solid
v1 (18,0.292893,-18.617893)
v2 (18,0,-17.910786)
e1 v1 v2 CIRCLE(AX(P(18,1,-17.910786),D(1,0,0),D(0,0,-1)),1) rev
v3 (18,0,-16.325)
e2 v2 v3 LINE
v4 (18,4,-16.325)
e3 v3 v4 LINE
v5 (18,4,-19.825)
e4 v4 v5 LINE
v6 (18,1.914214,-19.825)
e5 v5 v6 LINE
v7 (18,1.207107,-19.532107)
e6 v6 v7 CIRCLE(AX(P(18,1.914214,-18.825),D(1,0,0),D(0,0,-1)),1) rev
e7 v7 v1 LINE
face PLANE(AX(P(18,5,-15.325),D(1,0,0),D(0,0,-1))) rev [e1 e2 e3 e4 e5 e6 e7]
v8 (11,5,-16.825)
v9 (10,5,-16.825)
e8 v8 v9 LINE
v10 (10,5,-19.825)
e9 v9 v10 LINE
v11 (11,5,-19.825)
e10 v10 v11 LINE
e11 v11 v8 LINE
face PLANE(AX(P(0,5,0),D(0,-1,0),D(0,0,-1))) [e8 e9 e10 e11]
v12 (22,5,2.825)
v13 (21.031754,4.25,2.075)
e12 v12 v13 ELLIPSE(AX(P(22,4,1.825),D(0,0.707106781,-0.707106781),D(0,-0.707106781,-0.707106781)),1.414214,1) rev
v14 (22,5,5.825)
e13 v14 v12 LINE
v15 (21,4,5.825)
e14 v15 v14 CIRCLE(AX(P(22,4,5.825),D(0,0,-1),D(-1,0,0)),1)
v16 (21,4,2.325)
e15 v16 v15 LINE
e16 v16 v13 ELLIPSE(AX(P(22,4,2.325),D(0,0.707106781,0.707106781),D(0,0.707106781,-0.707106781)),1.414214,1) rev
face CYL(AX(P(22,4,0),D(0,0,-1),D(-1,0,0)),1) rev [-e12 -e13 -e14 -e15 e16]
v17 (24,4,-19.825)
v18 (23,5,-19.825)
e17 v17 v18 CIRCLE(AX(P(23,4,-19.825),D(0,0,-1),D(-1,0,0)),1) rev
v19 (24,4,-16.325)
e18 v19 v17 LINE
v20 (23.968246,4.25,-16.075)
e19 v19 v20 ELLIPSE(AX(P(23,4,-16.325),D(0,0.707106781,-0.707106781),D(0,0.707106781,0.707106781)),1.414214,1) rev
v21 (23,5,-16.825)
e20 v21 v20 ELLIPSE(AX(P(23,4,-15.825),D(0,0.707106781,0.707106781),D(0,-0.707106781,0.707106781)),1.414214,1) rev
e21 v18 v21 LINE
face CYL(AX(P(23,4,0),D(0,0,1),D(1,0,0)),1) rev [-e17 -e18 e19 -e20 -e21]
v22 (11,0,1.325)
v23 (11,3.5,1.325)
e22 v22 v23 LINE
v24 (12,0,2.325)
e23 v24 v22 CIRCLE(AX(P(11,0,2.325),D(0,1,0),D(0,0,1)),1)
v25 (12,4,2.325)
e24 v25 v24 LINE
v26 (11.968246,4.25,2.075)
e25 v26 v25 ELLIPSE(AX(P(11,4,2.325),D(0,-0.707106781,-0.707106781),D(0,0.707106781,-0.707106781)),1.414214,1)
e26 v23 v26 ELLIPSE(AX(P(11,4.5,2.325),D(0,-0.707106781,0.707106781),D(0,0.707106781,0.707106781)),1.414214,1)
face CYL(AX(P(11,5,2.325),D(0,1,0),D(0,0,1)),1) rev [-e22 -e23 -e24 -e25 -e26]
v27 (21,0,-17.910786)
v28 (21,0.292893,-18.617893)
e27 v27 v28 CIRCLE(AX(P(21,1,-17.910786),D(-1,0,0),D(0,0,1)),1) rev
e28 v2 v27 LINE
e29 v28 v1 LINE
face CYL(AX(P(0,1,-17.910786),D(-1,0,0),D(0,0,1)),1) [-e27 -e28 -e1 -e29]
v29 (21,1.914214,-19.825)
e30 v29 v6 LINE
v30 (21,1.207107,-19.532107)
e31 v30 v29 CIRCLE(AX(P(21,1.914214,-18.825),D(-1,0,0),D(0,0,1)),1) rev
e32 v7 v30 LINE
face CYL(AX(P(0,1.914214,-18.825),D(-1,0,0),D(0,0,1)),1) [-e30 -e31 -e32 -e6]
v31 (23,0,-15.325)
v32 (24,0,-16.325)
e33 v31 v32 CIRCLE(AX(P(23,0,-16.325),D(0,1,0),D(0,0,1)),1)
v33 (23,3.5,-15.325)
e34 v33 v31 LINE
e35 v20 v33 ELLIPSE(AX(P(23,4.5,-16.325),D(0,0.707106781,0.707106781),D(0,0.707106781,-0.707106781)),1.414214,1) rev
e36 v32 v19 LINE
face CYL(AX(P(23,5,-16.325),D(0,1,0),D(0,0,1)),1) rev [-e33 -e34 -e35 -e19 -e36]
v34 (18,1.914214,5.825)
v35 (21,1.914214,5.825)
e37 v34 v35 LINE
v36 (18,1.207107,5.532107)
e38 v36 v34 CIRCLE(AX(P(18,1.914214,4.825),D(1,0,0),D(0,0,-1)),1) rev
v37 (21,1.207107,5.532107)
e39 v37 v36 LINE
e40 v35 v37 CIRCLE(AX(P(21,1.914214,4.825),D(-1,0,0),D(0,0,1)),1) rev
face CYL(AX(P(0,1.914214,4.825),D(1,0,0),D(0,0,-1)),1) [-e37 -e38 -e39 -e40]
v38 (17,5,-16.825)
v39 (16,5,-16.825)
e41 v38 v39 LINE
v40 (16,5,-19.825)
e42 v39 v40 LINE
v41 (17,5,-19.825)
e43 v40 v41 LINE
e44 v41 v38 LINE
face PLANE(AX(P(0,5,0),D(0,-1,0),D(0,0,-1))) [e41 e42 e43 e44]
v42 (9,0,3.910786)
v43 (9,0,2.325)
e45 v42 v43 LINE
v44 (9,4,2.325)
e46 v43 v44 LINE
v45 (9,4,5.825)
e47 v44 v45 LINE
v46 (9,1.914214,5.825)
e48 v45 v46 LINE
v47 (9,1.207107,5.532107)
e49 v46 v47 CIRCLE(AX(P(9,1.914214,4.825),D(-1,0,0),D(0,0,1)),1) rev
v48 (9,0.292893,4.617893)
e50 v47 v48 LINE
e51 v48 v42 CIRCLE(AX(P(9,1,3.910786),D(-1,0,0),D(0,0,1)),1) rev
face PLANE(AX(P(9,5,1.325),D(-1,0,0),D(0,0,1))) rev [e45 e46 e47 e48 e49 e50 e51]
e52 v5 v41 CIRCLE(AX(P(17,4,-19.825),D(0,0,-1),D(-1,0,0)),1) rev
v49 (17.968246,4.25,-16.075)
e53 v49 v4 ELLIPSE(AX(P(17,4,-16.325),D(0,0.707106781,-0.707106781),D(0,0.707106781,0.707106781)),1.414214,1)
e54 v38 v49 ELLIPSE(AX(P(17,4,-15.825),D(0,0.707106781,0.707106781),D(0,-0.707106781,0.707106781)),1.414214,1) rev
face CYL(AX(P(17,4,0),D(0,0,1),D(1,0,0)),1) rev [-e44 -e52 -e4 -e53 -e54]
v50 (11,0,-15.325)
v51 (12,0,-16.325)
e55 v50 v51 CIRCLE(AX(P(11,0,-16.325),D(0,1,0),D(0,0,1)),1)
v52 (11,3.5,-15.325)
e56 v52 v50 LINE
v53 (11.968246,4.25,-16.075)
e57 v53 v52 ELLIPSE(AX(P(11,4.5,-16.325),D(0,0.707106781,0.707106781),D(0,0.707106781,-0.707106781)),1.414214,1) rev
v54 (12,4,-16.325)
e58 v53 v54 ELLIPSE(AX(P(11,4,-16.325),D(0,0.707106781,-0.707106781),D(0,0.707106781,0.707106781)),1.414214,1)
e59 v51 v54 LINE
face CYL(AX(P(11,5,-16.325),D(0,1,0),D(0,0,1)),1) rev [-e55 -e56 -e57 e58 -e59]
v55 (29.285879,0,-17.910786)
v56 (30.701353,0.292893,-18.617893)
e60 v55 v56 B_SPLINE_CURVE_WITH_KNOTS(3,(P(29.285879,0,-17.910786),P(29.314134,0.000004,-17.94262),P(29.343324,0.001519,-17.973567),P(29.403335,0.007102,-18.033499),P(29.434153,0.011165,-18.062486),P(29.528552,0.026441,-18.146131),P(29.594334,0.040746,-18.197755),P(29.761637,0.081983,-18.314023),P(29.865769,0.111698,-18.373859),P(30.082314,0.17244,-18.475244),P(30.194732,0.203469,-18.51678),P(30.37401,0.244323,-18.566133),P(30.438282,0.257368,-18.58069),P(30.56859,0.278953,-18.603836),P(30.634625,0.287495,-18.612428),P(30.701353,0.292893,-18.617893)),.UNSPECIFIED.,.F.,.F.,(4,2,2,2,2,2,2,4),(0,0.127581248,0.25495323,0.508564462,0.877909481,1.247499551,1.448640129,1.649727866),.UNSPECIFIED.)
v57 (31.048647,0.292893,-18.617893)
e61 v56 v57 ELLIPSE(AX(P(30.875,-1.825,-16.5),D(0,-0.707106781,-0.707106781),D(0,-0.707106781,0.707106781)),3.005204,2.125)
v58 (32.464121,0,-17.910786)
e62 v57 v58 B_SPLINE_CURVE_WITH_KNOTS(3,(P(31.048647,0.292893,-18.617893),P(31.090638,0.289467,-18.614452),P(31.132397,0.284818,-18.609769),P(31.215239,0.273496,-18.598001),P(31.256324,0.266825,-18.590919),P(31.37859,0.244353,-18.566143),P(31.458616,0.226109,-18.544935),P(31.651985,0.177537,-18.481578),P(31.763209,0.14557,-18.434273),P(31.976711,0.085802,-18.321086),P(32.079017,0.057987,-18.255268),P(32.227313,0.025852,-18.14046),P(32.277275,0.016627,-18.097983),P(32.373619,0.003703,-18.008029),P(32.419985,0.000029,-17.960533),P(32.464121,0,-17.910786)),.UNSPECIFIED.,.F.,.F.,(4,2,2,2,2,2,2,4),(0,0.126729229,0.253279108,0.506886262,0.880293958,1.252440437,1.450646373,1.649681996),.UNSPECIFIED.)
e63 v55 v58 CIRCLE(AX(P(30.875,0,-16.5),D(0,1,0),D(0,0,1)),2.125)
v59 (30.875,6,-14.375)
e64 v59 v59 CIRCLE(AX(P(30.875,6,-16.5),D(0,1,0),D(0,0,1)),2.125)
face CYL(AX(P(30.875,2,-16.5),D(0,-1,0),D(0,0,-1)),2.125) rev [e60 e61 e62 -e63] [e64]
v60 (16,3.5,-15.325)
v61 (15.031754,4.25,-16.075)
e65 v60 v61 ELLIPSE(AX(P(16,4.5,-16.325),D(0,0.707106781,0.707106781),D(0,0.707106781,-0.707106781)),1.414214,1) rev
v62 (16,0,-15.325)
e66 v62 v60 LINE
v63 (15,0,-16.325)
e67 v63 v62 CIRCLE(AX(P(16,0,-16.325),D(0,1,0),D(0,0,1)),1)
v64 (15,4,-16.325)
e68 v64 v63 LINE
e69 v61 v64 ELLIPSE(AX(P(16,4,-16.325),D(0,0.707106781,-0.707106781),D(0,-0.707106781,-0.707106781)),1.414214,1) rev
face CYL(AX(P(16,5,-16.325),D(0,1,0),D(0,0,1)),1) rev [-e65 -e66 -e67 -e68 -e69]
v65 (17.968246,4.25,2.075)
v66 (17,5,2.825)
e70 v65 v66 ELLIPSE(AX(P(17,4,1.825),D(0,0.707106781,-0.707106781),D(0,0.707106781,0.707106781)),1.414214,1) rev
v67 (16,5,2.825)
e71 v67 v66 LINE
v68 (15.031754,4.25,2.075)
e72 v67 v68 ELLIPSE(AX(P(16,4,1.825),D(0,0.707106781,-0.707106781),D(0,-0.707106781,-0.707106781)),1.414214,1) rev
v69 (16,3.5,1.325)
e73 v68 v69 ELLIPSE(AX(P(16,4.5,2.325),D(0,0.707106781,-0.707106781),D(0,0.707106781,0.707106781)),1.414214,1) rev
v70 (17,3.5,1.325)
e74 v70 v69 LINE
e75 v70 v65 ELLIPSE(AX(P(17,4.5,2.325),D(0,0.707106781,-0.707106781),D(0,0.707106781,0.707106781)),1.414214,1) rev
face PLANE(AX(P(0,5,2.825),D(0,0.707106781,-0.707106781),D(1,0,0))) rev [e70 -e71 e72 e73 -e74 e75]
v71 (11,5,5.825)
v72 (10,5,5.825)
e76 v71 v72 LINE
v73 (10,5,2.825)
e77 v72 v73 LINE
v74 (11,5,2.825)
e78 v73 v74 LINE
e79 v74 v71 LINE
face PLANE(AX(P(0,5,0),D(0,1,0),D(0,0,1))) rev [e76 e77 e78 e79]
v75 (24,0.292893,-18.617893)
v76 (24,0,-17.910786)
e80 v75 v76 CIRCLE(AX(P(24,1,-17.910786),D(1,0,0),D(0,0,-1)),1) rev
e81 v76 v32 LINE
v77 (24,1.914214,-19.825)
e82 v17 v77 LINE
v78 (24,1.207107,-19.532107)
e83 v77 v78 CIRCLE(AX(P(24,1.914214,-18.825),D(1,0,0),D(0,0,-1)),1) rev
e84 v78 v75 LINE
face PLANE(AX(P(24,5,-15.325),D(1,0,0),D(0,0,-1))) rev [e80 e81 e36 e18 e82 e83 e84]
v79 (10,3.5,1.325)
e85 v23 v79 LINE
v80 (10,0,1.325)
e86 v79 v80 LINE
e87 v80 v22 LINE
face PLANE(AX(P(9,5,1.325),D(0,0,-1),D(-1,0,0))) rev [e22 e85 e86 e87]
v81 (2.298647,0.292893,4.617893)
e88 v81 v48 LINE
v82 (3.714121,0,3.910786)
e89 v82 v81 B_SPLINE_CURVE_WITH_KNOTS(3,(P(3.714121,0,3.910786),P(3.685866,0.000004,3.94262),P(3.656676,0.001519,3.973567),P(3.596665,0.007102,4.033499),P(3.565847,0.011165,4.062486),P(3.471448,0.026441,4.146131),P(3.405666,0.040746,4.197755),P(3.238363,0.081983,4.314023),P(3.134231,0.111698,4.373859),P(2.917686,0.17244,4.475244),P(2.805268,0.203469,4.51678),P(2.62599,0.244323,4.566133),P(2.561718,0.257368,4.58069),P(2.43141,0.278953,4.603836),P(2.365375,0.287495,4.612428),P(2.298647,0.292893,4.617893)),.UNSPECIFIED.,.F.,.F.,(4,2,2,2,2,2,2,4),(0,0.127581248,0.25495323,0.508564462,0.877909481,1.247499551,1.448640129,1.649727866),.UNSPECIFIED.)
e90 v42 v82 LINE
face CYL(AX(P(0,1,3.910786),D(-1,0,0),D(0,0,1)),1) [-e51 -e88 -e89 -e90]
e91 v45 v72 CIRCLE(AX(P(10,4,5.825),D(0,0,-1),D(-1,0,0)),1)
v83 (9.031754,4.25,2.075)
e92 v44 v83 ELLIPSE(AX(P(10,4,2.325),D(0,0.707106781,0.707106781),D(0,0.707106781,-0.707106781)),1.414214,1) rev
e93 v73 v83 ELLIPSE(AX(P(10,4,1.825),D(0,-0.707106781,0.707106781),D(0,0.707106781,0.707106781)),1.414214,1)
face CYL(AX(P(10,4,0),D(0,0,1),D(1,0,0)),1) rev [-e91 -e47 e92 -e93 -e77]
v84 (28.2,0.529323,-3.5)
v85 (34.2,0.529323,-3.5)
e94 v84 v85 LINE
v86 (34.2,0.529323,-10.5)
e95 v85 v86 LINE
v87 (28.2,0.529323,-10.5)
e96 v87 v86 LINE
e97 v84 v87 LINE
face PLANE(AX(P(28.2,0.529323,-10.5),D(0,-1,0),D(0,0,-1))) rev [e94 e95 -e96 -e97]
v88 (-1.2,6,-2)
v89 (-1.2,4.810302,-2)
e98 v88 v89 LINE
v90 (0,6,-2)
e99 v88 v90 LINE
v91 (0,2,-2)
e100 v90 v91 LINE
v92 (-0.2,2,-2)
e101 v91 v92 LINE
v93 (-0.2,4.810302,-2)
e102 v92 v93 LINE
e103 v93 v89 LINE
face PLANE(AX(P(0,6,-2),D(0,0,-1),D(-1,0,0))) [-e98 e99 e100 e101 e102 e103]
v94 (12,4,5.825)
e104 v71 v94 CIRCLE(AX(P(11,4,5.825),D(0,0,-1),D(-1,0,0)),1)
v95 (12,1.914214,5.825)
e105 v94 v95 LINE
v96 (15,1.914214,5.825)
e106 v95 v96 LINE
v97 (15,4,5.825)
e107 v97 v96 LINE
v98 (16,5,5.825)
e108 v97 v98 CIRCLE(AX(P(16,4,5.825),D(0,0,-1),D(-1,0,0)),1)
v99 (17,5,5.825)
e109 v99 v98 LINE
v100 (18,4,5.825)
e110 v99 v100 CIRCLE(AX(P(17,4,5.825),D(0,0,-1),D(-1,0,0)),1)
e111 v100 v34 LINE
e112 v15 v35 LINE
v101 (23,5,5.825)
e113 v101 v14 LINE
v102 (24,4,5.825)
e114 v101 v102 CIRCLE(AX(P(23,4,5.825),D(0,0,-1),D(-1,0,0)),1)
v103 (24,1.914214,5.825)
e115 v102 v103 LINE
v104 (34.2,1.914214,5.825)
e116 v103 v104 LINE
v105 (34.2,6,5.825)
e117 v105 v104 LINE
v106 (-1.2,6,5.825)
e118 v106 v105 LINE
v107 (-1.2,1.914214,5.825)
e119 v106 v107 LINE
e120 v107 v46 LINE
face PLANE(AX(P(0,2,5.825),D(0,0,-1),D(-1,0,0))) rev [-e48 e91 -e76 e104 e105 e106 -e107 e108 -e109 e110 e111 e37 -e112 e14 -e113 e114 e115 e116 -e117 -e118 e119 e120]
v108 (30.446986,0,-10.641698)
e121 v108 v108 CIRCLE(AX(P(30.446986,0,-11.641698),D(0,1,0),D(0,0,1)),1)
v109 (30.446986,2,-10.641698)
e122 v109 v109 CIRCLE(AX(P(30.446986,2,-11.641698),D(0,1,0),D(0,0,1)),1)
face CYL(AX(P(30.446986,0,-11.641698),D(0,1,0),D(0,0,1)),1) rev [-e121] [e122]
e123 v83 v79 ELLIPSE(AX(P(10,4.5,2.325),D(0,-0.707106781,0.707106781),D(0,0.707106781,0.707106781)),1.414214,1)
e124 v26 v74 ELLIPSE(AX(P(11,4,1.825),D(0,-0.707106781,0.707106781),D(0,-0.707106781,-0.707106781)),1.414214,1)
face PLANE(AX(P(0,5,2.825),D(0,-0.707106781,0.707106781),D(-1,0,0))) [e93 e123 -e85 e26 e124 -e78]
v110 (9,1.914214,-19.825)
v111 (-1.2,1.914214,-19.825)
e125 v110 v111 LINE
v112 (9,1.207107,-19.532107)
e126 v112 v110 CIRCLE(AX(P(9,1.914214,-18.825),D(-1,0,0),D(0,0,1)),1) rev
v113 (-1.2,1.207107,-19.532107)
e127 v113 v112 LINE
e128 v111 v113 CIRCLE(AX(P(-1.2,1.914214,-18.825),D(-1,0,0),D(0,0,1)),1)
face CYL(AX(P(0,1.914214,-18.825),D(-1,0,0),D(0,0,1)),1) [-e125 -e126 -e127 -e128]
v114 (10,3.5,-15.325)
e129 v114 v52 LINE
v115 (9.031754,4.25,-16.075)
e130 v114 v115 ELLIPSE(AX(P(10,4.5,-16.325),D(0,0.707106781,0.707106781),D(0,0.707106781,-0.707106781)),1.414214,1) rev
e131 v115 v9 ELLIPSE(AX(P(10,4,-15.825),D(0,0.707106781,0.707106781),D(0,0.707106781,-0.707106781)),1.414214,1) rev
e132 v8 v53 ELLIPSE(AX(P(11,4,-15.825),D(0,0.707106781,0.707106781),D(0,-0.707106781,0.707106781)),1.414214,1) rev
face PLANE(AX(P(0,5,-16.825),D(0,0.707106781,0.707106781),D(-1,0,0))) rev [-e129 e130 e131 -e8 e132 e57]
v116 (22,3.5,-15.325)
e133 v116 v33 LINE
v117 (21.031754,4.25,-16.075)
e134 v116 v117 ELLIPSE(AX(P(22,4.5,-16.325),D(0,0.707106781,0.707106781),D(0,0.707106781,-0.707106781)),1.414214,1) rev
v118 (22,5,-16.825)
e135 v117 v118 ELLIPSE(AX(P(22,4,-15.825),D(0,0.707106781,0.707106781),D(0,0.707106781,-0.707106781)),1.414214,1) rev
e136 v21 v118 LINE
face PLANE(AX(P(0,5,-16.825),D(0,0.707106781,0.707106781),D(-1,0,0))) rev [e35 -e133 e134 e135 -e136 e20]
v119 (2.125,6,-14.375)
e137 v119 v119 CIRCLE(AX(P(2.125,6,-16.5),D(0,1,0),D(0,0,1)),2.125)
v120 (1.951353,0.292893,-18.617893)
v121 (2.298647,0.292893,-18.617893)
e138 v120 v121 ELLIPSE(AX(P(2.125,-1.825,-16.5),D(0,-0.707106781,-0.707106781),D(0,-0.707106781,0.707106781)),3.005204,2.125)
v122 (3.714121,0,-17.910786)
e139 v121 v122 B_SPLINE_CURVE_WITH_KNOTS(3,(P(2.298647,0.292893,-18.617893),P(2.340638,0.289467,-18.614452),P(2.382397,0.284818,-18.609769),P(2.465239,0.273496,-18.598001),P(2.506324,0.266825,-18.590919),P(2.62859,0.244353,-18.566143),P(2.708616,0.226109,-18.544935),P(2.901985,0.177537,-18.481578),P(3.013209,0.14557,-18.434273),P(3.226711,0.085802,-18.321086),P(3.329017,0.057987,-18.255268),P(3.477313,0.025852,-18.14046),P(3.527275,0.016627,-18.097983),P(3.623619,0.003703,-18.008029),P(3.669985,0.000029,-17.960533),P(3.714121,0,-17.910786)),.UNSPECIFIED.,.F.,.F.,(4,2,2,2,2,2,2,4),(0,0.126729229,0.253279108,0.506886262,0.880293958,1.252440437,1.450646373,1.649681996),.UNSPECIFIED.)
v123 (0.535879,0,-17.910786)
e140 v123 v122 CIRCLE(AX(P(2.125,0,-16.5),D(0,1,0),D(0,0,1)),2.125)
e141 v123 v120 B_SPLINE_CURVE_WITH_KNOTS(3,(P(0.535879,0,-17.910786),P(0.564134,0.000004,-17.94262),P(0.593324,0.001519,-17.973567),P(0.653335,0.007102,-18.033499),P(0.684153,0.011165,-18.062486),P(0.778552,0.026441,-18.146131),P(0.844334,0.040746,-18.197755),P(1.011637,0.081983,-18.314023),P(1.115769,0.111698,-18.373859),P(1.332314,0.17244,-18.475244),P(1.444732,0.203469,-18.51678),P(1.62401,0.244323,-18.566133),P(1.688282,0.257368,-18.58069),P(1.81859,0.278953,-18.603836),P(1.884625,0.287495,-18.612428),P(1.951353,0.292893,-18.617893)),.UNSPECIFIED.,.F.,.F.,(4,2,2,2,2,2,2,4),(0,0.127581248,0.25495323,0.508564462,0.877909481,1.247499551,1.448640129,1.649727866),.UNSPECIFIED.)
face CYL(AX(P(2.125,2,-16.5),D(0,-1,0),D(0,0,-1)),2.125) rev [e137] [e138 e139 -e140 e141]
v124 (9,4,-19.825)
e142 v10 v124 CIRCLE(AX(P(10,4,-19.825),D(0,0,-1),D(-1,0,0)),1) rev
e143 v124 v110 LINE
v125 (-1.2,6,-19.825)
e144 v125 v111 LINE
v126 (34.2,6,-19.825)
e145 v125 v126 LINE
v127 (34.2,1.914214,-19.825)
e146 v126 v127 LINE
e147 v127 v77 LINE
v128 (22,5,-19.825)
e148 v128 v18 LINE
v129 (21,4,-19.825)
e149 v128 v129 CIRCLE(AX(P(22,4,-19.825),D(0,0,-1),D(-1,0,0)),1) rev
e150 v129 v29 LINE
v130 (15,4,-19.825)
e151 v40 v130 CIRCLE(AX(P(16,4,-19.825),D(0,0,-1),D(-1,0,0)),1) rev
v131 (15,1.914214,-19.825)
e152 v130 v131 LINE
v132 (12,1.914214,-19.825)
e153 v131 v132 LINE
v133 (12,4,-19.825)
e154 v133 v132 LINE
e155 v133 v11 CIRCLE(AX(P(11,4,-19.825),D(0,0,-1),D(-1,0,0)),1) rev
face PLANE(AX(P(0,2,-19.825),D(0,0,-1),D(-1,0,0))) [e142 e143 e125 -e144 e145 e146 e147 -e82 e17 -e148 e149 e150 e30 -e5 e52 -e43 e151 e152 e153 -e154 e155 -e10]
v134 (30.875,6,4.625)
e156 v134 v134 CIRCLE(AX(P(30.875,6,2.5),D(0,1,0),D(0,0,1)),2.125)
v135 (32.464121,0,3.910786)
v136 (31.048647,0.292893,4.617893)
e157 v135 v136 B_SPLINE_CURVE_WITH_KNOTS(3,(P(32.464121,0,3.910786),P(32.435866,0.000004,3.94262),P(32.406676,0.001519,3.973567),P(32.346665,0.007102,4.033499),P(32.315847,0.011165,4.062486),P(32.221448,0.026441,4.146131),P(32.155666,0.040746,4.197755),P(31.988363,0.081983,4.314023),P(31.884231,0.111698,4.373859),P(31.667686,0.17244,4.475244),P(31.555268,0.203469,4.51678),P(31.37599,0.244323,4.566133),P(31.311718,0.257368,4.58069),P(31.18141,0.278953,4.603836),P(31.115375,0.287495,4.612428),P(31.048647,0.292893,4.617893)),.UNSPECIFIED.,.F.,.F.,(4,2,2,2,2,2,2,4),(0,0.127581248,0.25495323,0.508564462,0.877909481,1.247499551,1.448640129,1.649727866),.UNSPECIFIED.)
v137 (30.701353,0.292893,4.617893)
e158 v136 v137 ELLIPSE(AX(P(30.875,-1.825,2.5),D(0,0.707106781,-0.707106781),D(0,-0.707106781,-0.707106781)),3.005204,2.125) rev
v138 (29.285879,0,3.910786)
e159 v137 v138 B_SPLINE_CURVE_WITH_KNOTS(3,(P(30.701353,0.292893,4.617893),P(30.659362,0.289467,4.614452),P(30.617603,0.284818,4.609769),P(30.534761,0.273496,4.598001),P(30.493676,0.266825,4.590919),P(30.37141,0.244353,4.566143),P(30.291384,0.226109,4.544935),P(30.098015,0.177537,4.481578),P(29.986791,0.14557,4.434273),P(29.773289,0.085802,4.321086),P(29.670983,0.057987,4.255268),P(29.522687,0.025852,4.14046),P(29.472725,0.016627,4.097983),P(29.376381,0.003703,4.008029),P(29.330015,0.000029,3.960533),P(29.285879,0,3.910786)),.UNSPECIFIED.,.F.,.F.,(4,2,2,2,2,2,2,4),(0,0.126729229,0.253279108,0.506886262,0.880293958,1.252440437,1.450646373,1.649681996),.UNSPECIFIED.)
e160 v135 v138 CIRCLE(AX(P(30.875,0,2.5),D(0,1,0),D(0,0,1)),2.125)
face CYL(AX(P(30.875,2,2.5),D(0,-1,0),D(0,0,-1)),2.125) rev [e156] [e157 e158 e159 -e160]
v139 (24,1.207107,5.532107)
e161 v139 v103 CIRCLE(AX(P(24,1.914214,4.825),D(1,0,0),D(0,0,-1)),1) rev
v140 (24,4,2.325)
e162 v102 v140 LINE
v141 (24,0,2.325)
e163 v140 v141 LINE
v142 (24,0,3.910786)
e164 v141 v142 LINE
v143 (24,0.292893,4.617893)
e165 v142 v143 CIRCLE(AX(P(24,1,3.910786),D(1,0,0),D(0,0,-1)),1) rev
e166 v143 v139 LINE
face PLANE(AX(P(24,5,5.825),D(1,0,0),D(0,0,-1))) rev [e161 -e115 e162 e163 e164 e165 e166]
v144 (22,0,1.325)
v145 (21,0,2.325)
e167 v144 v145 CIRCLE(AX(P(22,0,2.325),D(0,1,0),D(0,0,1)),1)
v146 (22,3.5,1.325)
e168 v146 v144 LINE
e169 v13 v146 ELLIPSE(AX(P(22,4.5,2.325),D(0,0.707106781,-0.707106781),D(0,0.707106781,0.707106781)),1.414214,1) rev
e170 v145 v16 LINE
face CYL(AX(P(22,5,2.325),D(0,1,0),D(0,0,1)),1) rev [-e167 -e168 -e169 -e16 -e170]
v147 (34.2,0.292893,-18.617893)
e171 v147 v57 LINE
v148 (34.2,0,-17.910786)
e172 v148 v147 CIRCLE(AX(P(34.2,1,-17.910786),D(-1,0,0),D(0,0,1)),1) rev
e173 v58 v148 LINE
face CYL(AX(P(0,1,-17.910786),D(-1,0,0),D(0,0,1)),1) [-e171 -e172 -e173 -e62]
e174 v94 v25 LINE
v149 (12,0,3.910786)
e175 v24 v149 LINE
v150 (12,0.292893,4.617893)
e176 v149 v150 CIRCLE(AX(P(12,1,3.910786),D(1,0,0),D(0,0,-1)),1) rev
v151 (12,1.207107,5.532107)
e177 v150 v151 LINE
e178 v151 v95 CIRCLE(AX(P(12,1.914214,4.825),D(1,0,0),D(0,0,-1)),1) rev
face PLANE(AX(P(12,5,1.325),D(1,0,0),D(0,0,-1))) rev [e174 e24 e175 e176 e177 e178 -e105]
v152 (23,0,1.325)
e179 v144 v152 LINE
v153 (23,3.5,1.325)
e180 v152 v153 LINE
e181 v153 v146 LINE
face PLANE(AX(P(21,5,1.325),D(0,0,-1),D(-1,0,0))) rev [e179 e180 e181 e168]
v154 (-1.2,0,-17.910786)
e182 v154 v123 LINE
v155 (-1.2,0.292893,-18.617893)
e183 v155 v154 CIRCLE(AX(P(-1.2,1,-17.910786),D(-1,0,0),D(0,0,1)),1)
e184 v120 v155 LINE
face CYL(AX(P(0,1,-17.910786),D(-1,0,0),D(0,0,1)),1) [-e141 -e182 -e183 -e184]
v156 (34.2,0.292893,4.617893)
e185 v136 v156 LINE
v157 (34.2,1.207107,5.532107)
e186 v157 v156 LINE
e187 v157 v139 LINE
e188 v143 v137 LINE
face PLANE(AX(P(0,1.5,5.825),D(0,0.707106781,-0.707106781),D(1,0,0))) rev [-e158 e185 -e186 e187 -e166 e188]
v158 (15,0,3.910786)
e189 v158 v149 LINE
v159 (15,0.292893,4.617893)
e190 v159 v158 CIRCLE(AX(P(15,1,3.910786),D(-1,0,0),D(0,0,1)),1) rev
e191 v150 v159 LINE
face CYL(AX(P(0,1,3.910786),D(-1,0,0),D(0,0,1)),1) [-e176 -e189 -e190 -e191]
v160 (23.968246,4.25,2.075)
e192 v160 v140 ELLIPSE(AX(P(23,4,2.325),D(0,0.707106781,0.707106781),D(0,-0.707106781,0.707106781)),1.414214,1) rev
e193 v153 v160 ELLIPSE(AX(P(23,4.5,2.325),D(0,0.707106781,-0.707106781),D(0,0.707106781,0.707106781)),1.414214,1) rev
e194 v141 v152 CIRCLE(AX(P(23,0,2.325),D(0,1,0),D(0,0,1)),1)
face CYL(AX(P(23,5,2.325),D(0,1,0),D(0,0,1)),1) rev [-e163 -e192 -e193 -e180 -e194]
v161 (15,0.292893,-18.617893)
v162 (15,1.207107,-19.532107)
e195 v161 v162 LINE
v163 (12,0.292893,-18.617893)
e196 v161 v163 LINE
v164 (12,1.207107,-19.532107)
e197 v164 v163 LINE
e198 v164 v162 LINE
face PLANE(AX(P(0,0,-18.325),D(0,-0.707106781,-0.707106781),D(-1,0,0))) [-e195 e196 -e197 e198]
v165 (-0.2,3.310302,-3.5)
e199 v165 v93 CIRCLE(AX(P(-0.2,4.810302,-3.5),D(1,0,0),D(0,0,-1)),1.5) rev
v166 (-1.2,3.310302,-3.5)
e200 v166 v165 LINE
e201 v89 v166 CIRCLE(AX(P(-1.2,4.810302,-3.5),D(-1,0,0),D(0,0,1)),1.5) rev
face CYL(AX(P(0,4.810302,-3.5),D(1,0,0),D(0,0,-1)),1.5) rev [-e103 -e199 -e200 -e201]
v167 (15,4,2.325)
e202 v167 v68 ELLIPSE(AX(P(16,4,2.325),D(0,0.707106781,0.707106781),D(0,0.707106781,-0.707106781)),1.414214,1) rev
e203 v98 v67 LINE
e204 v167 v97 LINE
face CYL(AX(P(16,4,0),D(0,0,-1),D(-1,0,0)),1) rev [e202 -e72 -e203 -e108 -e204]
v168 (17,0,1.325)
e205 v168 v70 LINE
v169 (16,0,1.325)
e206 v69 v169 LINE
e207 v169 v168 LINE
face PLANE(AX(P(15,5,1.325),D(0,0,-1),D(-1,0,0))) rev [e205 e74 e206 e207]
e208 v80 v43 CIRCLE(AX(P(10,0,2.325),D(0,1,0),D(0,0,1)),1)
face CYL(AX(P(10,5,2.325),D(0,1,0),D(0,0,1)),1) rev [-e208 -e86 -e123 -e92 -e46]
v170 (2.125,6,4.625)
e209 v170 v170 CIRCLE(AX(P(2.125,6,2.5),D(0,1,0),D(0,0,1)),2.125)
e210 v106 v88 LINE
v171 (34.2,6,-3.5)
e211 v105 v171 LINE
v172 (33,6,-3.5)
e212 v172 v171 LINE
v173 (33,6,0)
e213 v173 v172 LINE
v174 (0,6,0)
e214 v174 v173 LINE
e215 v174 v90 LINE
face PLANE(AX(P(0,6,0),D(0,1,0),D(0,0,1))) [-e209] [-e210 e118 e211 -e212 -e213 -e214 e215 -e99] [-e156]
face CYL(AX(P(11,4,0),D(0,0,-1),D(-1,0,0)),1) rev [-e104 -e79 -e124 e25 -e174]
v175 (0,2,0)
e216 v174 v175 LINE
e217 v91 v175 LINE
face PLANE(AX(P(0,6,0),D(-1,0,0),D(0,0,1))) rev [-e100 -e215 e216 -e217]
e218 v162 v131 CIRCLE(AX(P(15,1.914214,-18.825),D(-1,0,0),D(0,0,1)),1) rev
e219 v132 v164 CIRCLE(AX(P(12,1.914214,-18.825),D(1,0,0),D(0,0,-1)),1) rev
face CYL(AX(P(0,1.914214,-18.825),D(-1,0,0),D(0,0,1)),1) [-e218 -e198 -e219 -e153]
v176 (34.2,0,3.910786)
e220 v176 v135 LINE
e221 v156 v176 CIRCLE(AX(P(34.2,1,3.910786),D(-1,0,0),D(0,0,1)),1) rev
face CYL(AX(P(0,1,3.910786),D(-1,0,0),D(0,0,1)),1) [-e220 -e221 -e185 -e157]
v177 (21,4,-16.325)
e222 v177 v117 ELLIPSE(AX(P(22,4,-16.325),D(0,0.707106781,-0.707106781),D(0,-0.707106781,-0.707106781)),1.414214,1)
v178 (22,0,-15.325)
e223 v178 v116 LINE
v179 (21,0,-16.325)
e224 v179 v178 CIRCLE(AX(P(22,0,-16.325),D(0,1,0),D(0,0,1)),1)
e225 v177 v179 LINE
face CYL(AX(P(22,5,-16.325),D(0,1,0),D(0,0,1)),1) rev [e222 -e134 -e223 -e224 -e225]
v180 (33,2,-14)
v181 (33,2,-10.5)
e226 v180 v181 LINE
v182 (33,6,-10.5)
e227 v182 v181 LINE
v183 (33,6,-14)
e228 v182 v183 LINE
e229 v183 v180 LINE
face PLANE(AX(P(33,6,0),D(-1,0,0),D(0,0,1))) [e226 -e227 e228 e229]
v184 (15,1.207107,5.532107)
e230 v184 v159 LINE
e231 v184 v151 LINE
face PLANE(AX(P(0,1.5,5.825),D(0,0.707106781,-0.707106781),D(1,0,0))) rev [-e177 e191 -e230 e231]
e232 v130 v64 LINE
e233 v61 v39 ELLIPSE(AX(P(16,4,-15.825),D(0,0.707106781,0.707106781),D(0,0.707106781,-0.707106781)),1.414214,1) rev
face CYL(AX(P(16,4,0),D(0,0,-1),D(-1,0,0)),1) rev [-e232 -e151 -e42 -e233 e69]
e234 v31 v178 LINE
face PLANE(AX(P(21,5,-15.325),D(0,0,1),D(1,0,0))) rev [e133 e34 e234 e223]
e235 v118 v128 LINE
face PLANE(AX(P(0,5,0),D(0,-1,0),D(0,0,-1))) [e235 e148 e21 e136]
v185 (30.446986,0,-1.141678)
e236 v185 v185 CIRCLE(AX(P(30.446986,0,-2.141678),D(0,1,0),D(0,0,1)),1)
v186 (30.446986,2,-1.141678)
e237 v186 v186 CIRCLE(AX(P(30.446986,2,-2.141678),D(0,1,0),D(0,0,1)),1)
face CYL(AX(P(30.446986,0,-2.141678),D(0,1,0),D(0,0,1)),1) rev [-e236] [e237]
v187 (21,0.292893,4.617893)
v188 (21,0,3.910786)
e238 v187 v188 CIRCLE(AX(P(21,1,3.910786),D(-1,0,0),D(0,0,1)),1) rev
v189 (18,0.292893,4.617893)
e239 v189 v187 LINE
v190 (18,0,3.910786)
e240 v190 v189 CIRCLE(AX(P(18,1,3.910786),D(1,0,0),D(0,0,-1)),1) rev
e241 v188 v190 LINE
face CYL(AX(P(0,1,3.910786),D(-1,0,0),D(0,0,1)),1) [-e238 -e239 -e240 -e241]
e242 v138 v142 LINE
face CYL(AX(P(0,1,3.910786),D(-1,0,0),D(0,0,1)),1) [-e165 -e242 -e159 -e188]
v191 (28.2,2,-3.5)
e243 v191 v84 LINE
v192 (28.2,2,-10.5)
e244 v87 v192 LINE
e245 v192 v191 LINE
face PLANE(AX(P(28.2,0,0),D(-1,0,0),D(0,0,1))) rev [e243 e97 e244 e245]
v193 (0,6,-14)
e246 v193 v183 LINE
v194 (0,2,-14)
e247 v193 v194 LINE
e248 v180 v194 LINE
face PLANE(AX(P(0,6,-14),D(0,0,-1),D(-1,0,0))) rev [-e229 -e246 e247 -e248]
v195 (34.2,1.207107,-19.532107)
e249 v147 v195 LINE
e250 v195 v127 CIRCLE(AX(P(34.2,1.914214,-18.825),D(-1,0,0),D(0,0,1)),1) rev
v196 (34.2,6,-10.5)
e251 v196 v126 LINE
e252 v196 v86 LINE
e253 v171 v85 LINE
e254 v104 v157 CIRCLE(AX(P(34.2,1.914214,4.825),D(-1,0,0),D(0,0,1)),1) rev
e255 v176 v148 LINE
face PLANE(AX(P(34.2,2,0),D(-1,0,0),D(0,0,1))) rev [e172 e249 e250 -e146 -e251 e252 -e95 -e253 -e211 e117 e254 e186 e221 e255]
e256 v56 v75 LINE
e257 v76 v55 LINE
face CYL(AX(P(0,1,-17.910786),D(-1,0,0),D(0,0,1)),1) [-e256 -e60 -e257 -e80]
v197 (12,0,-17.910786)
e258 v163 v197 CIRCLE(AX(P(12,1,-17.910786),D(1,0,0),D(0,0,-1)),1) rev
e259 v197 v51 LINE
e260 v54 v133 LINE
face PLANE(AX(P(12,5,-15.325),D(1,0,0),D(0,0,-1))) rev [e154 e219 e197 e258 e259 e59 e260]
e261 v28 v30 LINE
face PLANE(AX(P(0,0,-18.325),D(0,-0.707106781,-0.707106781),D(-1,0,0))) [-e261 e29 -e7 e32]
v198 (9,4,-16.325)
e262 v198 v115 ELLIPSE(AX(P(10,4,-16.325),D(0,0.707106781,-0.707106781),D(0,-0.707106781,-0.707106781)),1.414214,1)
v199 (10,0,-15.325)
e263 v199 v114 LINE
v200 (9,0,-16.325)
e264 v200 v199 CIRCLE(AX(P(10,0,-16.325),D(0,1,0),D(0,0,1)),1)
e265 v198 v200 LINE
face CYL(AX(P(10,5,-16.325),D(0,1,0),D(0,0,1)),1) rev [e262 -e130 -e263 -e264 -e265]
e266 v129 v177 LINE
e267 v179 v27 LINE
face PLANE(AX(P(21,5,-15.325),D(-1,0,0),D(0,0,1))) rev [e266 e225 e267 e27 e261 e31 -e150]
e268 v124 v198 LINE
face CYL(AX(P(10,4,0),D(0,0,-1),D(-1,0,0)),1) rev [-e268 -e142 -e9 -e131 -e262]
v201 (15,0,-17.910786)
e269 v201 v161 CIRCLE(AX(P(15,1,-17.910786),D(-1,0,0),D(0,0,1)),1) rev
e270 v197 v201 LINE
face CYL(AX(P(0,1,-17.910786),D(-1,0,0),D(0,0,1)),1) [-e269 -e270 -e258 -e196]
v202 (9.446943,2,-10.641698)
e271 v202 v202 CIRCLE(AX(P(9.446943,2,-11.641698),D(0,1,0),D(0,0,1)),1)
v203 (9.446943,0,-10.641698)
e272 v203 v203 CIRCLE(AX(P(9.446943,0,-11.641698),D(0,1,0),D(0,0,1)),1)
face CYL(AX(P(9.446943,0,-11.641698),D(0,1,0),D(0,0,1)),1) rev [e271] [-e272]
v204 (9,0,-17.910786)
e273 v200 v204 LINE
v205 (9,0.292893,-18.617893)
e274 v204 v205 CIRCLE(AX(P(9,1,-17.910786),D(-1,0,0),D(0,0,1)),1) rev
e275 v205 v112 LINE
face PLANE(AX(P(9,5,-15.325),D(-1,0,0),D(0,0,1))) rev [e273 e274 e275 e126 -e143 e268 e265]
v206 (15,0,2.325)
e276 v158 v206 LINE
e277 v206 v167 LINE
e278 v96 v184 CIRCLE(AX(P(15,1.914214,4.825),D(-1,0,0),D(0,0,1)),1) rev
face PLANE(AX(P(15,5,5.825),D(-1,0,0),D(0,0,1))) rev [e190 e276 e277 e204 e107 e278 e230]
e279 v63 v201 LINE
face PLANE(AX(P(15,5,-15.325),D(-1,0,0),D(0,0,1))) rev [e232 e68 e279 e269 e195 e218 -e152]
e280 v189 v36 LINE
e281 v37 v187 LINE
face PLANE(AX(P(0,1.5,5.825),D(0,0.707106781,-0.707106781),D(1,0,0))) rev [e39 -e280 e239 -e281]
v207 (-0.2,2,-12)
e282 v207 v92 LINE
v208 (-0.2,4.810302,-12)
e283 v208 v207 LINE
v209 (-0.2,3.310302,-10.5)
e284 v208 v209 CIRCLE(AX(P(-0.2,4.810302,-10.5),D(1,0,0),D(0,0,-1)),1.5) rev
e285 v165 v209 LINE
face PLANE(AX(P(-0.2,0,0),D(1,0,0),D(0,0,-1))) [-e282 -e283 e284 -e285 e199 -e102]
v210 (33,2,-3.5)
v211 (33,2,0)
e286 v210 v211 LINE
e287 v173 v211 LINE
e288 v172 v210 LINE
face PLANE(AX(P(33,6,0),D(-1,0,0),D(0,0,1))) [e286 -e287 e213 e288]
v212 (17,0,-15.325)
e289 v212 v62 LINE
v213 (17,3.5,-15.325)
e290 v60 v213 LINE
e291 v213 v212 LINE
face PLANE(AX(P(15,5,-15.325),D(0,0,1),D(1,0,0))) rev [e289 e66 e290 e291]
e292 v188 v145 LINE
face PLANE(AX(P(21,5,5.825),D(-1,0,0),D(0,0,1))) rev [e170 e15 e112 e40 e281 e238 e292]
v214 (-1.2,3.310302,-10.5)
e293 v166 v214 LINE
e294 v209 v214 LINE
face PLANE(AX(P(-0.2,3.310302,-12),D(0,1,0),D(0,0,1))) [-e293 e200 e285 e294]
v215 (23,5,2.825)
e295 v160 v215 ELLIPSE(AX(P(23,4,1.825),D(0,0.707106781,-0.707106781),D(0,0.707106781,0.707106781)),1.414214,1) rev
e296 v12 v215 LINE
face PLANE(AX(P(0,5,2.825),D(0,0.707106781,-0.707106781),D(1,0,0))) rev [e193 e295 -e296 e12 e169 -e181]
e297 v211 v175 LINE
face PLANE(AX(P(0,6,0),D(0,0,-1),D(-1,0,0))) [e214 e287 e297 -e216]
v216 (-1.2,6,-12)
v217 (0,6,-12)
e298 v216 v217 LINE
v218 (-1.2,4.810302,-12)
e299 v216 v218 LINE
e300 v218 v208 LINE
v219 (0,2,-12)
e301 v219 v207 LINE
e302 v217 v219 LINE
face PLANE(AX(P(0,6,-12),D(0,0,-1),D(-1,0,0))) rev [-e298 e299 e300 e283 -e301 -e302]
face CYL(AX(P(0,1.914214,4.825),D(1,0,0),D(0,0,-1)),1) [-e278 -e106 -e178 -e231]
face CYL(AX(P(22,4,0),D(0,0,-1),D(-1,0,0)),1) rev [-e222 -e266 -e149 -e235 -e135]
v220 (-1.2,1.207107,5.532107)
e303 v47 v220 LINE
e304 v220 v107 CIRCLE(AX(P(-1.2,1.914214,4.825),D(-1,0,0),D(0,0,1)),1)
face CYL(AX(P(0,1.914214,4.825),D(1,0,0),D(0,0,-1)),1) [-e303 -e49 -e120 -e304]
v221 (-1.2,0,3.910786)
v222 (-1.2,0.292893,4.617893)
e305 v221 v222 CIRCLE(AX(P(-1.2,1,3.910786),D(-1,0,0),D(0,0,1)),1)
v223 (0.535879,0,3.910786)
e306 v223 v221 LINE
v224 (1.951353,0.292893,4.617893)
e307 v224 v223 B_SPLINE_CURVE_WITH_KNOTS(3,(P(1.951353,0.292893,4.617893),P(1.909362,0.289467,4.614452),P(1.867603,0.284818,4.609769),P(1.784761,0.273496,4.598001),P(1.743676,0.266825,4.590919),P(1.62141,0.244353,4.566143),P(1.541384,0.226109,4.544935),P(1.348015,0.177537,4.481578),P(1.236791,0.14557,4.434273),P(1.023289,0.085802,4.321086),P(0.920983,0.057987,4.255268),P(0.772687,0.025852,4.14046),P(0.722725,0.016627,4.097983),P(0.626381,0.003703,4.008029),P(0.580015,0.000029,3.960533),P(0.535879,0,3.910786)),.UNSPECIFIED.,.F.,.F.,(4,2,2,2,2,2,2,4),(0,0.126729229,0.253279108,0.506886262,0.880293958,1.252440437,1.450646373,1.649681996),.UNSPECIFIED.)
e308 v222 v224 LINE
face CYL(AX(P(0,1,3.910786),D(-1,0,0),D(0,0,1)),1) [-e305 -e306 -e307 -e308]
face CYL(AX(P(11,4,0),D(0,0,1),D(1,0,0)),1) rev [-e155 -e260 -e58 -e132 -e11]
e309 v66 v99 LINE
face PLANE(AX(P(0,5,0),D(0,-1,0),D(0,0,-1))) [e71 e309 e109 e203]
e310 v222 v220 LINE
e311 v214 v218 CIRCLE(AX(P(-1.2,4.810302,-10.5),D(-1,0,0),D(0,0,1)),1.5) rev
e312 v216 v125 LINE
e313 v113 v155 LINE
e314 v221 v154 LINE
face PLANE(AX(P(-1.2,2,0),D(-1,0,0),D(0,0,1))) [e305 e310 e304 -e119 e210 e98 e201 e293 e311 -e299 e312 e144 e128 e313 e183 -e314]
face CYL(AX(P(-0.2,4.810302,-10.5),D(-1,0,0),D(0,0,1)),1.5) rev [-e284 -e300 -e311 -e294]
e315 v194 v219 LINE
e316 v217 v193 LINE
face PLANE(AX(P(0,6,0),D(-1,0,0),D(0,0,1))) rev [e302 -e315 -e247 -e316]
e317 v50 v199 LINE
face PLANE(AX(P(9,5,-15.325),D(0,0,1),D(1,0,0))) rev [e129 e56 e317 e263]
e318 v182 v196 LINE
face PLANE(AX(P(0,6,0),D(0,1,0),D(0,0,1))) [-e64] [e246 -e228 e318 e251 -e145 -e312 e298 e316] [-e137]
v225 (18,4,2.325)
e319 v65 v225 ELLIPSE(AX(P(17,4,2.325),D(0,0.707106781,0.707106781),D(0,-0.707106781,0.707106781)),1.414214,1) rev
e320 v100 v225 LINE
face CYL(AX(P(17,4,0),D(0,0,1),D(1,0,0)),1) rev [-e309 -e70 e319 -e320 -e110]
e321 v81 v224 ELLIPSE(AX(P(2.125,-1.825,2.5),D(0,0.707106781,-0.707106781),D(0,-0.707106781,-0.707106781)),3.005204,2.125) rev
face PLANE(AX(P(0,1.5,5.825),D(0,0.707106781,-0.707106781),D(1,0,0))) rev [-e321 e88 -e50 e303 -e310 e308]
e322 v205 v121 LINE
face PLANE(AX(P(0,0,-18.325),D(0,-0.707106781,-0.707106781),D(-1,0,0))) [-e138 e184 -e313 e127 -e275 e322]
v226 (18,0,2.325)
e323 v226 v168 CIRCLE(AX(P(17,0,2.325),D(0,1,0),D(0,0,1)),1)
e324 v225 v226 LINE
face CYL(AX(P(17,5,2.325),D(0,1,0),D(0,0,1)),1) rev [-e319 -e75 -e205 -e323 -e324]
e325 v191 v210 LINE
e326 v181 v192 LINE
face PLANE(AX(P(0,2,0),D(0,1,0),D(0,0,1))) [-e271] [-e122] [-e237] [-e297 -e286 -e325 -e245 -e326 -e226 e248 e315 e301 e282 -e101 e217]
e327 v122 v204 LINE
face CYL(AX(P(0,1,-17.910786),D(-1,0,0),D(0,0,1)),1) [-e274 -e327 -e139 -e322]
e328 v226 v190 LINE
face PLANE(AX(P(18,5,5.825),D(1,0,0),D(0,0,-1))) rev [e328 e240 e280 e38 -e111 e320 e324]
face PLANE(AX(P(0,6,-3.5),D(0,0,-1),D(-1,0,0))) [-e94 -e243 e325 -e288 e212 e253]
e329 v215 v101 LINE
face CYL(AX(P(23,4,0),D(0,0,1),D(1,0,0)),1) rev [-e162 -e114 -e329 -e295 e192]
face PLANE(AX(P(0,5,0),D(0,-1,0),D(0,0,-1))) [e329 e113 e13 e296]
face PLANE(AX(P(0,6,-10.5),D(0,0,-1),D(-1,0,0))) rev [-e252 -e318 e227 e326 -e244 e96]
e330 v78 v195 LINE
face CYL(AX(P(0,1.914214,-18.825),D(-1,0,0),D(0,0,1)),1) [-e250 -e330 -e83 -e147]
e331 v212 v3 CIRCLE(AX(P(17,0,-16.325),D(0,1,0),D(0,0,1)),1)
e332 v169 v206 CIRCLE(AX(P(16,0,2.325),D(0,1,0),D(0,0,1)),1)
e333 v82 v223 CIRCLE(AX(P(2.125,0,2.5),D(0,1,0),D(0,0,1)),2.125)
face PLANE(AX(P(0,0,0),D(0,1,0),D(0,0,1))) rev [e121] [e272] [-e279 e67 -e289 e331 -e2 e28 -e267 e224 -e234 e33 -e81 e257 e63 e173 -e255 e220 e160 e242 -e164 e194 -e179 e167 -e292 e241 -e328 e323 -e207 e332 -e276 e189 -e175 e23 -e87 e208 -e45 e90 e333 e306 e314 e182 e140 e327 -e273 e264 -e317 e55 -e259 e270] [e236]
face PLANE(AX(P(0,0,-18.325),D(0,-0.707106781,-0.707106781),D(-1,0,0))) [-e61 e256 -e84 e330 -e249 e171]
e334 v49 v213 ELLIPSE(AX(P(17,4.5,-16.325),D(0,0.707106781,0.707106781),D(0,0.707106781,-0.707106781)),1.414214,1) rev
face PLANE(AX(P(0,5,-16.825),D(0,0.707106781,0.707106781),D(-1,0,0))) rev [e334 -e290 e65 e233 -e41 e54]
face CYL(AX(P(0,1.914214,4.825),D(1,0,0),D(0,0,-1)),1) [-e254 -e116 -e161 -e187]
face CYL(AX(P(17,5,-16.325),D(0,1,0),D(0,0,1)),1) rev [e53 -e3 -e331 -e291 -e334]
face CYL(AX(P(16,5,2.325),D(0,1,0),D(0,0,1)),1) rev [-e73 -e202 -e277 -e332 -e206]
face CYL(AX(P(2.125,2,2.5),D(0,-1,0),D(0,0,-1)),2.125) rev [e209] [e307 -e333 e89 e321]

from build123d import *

# Parameters (mm, degrees)
SKETCH1_W           = 35.4
SKETCH1_H           = 25.65
SKETCH1_R           = 2.125
BOSS_EXTRUDE1_DEPTH = 2
SKETCH1_3_R         = 2.125
BOSS_EXTRUDE2_DEPTH = 6
SKETCH2_W           = 3
SKETCH2_H           = 4.5
CUT_EXTRUDE1_DEPTH  = 5
CHAMFER1_SIZE       = 1.5
FILLET1_R           = 1
SKETCH3_W           = 7
SKETCH3_H           = 5.470677448
CUT_EXTRUDE2_DEPTH  = 6
SKETCH4_R           = 1
CUT_EXTRUDE3_DEPTH  = 2
SKETCH5_W           = 10
SKETCH5_H           = 1.310302081
BOSS_EXTRUDE3_DEPTH = 1
FILLET2_R           = 1.5


with BuildPart() as part:
    # Sketch1 → Boss-Extrude1 (new body)
    with BuildSketch(Plane(origin=(0, 0, 0), x_dir=(1, 0, 0), z_dir=(0, 1, 0))):
        with Locations((16.5, 7)):
            Rectangle(SKETCH1_W, SKETCH1_H)
        with Locations(Location((30.875, -2.5, 0), (0, 0, 270))):
            Circle(SKETCH1_R, mode=Mode.SUBTRACT)
        with Locations(Location((2.125, -2.5, 0), (0, 0, 270))):
            Circle(SKETCH1_R, mode=Mode.SUBTRACT)
        with Locations(Location((2.125, 16.5, 0), (0, 0, 270))):
            Circle(SKETCH1_R, mode=Mode.SUBTRACT)
        with Locations(Location((30.875, 16.5, 0), (0, 0, 270))):
            Circle(SKETCH1_R, mode=Mode.SUBTRACT)
    extrude(amount=BOSS_EXTRUDE1_DEPTH)

    # Sketch1<3> → Boss-Extrude2 (add)
    # profile 1 of 2: a face of its own
    with BuildSketch(Plane(origin=(0, 0, 0), x_dir=(1, 0, 0), z_dir=(0, 1, 0))):
        Polygon((33, 0), (0, 0), (0, 2), (-1.2, 2), (-1.2, -5.825), (34.2, -5.825), (34.2, 3.5), (33, 3.5), align=None)
        with Locations(Location((2.125, -2.5, 0), (0, 0, 270))):
            Circle(SKETCH1_3_R, mode=Mode.SUBTRACT)
        with Locations(Location((30.875, -2.5, 0), (0, 0, 270))):
            Circle(SKETCH1_3_R, mode=Mode.SUBTRACT)
    # profile 2 of 2: a face of its own
    with BuildSketch(Plane(origin=(0, 0, 0), x_dir=(1, 0, 0), z_dir=(0, 1, 0))):
        Polygon((-1.2, 12), (0, 12), (0, 14), (33, 14), (33, 10.5), (34.2, 10.5), (34.2, 19.825), (-1.2, 19.825), align=None)
        with Locations(Location((2.125, 16.5, 0), (0, 0, 270))):
            Circle(SKETCH1_3_R, mode=Mode.SUBTRACT)
        with Locations(Location((30.875, 16.5, 0), (0, 0, 270))):
            Circle(SKETCH1_3_R, mode=Mode.SUBTRACT)
    extrude(amount=BOSS_EXTRUDE2_DEPTH)

    # Sketch2 → Cut-Extrude1 (cut)
    with BuildSketch(Plane(origin=(0, 0, 0), x_dir=(-1, 0, 0), z_dir=(0, -1, 0))):
        with Locations((-10.5, -3.575)):
            Rectangle(SKETCH2_W, SKETCH2_H)
        with Locations((-16.5, -3.575)):
            Rectangle(SKETCH2_W, SKETCH2_H)
        with Locations((-22.5, -3.575)):
            Rectangle(SKETCH2_W, SKETCH2_H)
        with Locations((-22.5, 17.575)):
            Rectangle(SKETCH2_W, SKETCH2_H)
        with Locations((-16.5, 17.575)):
            Rectangle(SKETCH2_W, SKETCH2_H)
        with Locations((-10.5, 17.575)):
            Rectangle(SKETCH2_W, SKETCH2_H)
    extrude(amount=-CUT_EXTRUDE1_DEPTH, mode=Mode.SUBTRACT)

    # Chamfer1
    # the kernel refuses this chamfer: 1.5 mm, written as the material it adds along each edge
    with BuildSketch(Plane(origin=(5.142475518, 5, -15.325), x_dir=(0, -0.9996219169112968, 0.027495876610586775), z_dir=(1, 0, 0)), Plane(origin=(11.142475518, 5, -15.325), x_dir=(0, -0.9996219169112968, 0.027495876610586775), z_dir=(1, 0, 0)), Plane(origin=(17.142475518, 5, -15.325), x_dir=(0, -0.9996219169112968, 0.027495876610586775), z_dir=(1, 0, 0)), Plane(origin=(5.142475518, 5, 1.325), x_dir=(0, 0.0274958766105862, 0.9996219169112968), z_dir=(1, 0, 0))) as chamfer1_piece_1:
        Polygon((CHAMFER1_SIZE * 0.999621916911, CHAMFER1_SIZE * 0.0274958766106), (-CHAMFER1_SIZE * 0.0274958766106, CHAMFER1_SIZE * 0.999621916911), (0, 0), align=None)
    extrude(amount=10.715048964)
    with BuildSketch(Plane(origin=(27.857524482, 5, 1.325), x_dir=(0, 0.0274958766105862, 0.9996219169112968), z_dir=(-1, 0, 0)), Plane(origin=(21.857524482, 5, 1.325), x_dir=(0, 0.0274958766105862, 0.9996219169112968), z_dir=(-1, 0, 0))) as chamfer1_piece_2:
        Polygon((CHAMFER1_SIZE * 0.999621916911, -CHAMFER1_SIZE * 0.0274958766106), (-CHAMFER1_SIZE * 0.0274958766106, -CHAMFER1_SIZE * 0.999621916911), (0, 0), align=None)
    extrude(amount=10.715048964)
    # the kernel refuses this chamfer: 1.5 mm, written as the material it takes off along each edge
    with BuildSketch(Plane(origin=(18.857524482, 0, -19.825), x_dir=(0, 0.9996219169112968, -0.027495876610586778), z_dir=(-1, 0, 0)), Plane(origin=(24.857524482, 0, -19.825), x_dir=(0, 0.9996219169112968, -0.027495876610586778), z_dir=(-1, 0, 0)), Plane(origin=(8.142475518, 0, 5.825), x_dir=(0, 0.9996219169112968, 0.027495876610586202), z_dir=(1, 0, 0)), Plane(origin=(14.142475518, 0, 5.825), x_dir=(0, 0.9996219169112968, 0.027495876610586202), z_dir=(1, 0, 0))) as chamfer1_2_piece_1:
        Polygon((CHAMFER1_SIZE * 0.999621916911, -CHAMFER1_SIZE * 0.0274958766106), (-CHAMFER1_SIZE * 0.0274958766106, -CHAMFER1_SIZE * 0.999621916911), (0, 0), align=None)
    extrude(amount=10.715048964, mode=Mode.SUBTRACT)
    with BuildSketch(Plane(origin=(38.057524482, 0, -19.825), x_dir=(0, 0.9996219169112968, -0.027495876610586778), z_dir=(-1, 0, 0)), Plane(origin=(20.142475518, 0, 5.825), x_dir=(0, 0.9996219169112968, 0.027495876610586202), z_dir=(1, 0, 0)), Plane(origin=(-5.057524482, 0, 5.825), x_dir=(0, 0.9996219169112968, 0.027495876610586202), z_dir=(1, 0, 0)), Plane(origin=(12.857524482, 0, -19.825), x_dir=(0, 0.9996219169112968, -0.027495876610586778), z_dir=(-1, 0, 0))) as chamfer1_2_piece_2:
        Polygon((CHAMFER1_SIZE * 0.999621916911, -CHAMFER1_SIZE * 0.0274958766106), (-CHAMFER1_SIZE * 0.0274958766106, -CHAMFER1_SIZE * 0.999621916911), (0, 0), align=None)
    extrude(amount=17.915048964, mode=Mode.SUBTRACT)

    # Fillet1
    # the kernel refuses this fillet: 1 mm, written as the material it adds along each edge
    with BuildSketch(Plane(origin=(21, 0, -15.325), x_dir=(0, 0, -1), z_dir=(0, 1, 0)), Plane(origin=(15, 0, -15.325), x_dir=(0, 0, -1), z_dir=(0, 1, 0)), Plane(origin=(12, 0, -15.325), x_dir=(-1, 0, 0), z_dir=(0, 1, 0)), Plane(origin=(24, 0, -15.325), x_dir=(-1, 0, 0), z_dir=(0, 1, 0)), Plane(origin=(18, 0, -15.325), x_dir=(-1, 0, 0), z_dir=(0, 1, 0)), Plane(origin=(12, 0, 1.325), x_dir=(0, 0, 1), z_dir=(0, 1, 0)), Plane(origin=(18, 0, 1.325), x_dir=(0, 0, 1), z_dir=(0, 1, 0)), Plane(origin=(9, 0, 1.325), x_dir=(1, 0, 0), z_dir=(0, 1, 0)), Plane(origin=(15, 0, 1.325), x_dir=(1, 0, 0), z_dir=(0, 1, 0)), Plane(origin=(21, 0, 1.325), x_dir=(1, 0, 0), z_dir=(0, 1, 0))) as fillet1_piece_1:
        with BuildLine():
            CenterArc((FILLET1_R, -FILLET1_R), FILLET1_R, 90, 90)
            Line((0, -FILLET1_R), (0, 0))
            Line((0, 0), (FILLET1_R, 0))
        make_face()
    extrude(amount=6)
    with BuildSketch(Plane(origin=(21, 5, -19.825), x_dir=(1, 0, 0), z_dir=(0, 0, 1)), Plane(origin=(15, 5, -19.825), x_dir=(1, 0, 0), z_dir=(0, 0, 1)), Plane(origin=(9, 5, -19.825), x_dir=(1, 0, 0), z_dir=(0, 0, 1)), Plane(origin=(12, 5, -14.325), x_dir=(-1, 0, 0), z_dir=(0, 0, -1)), Plane(origin=(24, 5, -14.325), x_dir=(-1, 0, 0), z_dir=(0, 0, -1)), Plane(origin=(18, 5, -14.325), x_dir=(-1, 0, 0), z_dir=(0, 0, -1)), Plane(origin=(15, 5, 0.325), x_dir=(1, 0, 0), z_dir=(0, 0, 1)), Plane(origin=(24, 5, 5.825), x_dir=(-1, 0, 0), z_dir=(0, 0, -1)), Plane(origin=(18, 5, 5.825), x_dir=(-1, 0, 0), z_dir=(0, 0, -1))) as fillet1_piece_2:
        with BuildLine():
            CenterArc((FILLET1_R, -FILLET1_R), FILLET1_R, 90, 90)
            Line((0, -FILLET1_R), (0, 0))
            Line((0, 0), (FILLET1_R, 0))
        make_face()
    extrude(amount=5.5)
    with BuildSketch(Plane(origin=(9, 0, -15.325), x_dir=(1, 0, 0), z_dir=(0, 1, 0)), Plane(origin=(24, 0, 1.325), x_dir=(-1, 0, 0), z_dir=(0, 1, 0))) as fillet1_piece_3:
        with BuildLine():
            CenterArc((FILLET1_R, FILLET1_R), FILLET1_R, 180, 90)
            Line((0, FILLET1_R), (0, 0))
            Line((0, 0), (FILLET1_R, 0))
        make_face()
    extrude(amount=6)
    with BuildSketch(Plane(origin=(21, 5, 0.325), x_dir=(0, -1, 0), z_dir=(0, 0, 1)), Plane(origin=(9, 5, 5.825), x_dir=(1, 0, 0), z_dir=(0, 0, -1)), Plane(origin=(12, 5, 0.325), x_dir=(-1, 0, 0), z_dir=(0, 0, 1))) as fillet1_piece_4:
        with BuildLine():
            CenterArc((FILLET1_R, FILLET1_R), FILLET1_R, 180, 90)
            Line((0, FILLET1_R), (0, 0))
            Line((0, 0), (FILLET1_R, 0))
        make_face()
    extrude(amount=5.5)
    # the kernel refuses this fillet: 1 mm, written as the material it takes off along each edge
    with BuildSketch(Plane(origin=(35.235533906, 0, -18.325), x_dir=(0, 0, 1), z_dir=(-1, 0, 0)), Plane(origin=(2.071956853, 0, -18.325), x_dir=(0, 0, 1), z_dir=(-1, 0, 0)), Plane(origin=(-2.235533906, 0, 4.325), x_dir=(0, 0, -1), z_dir=(1, 0, 0)), Plane(origin=(30.928043147, 0, 4.325), x_dir=(0, 0, -1), z_dir=(1, 0, 0))) as fillet1_2_piece_1:
        with BuildLine():
            CenterArc((FILLET1_R * 0.414213562373, FILLET1_R), FILLET1_R, 225, 45)
            Line((-FILLET1_R * 0.292893218813, FILLET1_R * 0.292893218813), (0, 0))
            Line((0, 0), (FILLET1_R * 0.414213562373, 0))
        make_face()
    extrude(amount=4.307490759, mode=Mode.SUBTRACT)
    with BuildSketch(Plane(origin=(22.964466094, 1.5, -19.825), x_dir=(0, -0.7071067811862655, 0.7071067811868295), z_dir=(1, 0, 0)), Plane(origin=(-2.235533906, 1.5, -19.825), x_dir=(0, -0.7071067811862655, 0.7071067811868295), z_dir=(1, 0, 0))) as fillet1_2_piece_2:
        with BuildLine():
            CenterArc((FILLET1_R * 0.414213562373, -FILLET1_R), FILLET1_R, 90, 45)
            Line((-FILLET1_R * 0.292893218814, -FILLET1_R * 0.292893218814), (0, 0))
            Line((0, 0), (FILLET1_R * 0.414213562373, 0))
        make_face()
    extrude(amount=12.271067812, mode=Mode.SUBTRACT)
    with BuildSketch(Plane(origin=(22.964466094, 0, -18.325), x_dir=(0, 0, 1), z_dir=(1, 0, 0)), Plane(origin=(2.178043147, 0, -18.325), x_dir=(0, 0, 1), z_dir=(1, 0, 0)), Plane(origin=(10.035533906, 0, 4.325), x_dir=(0, 0, -1), z_dir=(-1, 0, 0)), Plane(origin=(30.821956853, 0, 4.325), x_dir=(0, 0, -1), z_dir=(-1, 0, 0))) as fillet1_2_piece_3:
        with BuildLine():
            CenterArc((FILLET1_R * 0.414213562373, -FILLET1_R), FILLET1_R, 90, 45)
            Line((-FILLET1_R * 0.292893218813, -FILLET1_R * 0.292893218813), (0, 0))
            Line((0, 0), (FILLET1_R * 0.414213562373, 0))
        make_face()
    extrude(amount=7.857490759, mode=Mode.SUBTRACT)
    with BuildSketch(Plane(origin=(16.964466094, 1.5, -19.825), x_dir=(0, -0.7071067811862655, 0.7071067811868295), z_dir=(1, 0, 0)), Plane(origin=(16.964466094, 0, -18.325), x_dir=(0, 0, 1), z_dir=(1, 0, 0)), Plane(origin=(10.964466094, 1.5, -19.825), x_dir=(0, -0.7071067811862655, 0.7071067811868295), z_dir=(1, 0, 0)), Plane(origin=(10.964466094, 0, -18.325), x_dir=(0, 0, 1), z_dir=(1, 0, 0)), Plane(origin=(16.035533906, 0, 4.325), x_dir=(0, 0, -1), z_dir=(-1, 0, 0)), Plane(origin=(22.035533906, 0, 4.325), x_dir=(0, 0, -1), z_dir=(-1, 0, 0))) as fillet1_2_piece_4:
        with BuildLine():
            CenterArc((FILLET1_R * 0.414213562373, -FILLET1_R), FILLET1_R, 90, 45)
            Line((-FILLET1_R * 0.292893218814, -FILLET1_R * 0.292893218814), (0, 0))
            Line((0, 0), (FILLET1_R * 0.414213562373, 0))
        make_face()
    extrude(amount=5.071067812, mode=Mode.SUBTRACT)
    with BuildSketch(Plane(origin=(-2.235533906, 1.5, 5.825), x_dir=(0, -0.707106781186265, -0.70710678118683), z_dir=(1, 0, 0)), Plane(origin=(22.964466094, 1.5, 5.825), x_dir=(0, -0.707106781186265, -0.70710678118683), z_dir=(1, 0, 0))) as fillet1_2_piece_5:
        with BuildLine():
            CenterArc((FILLET1_R * 0.414213562373, FILLET1_R), FILLET1_R, 225, 45)
            Line((-FILLET1_R * 0.292893218814, FILLET1_R * 0.292893218814), (0, 0))
            Line((0, 0), (FILLET1_R * 0.414213562373, 0))
        make_face()
    extrude(amount=12.271067812, mode=Mode.SUBTRACT)
    with BuildSketch(Plane(origin=(10.964466094, 1.5, 5.825), x_dir=(0, -0.7071067811862647, -0.7071067811868302), z_dir=(1, 0, 0)), Plane(origin=(16.964466094, 1.5, 5.825), x_dir=(0, -0.7071067811862652, -0.7071067811868297), z_dir=(1, 0, 0))) as fillet1_2_piece_6:
        with BuildLine():
            CenterArc((FILLET1_R * 0.414213562373, FILLET1_R), FILLET1_R, 225, 45)
            Line((-FILLET1_R * 0.292893218814, FILLET1_R * 0.292893218814), (0, 0))
            Line((0, 0), (FILLET1_R * 0.414213562373, 0))
        make_face()
    extrude(amount=5.071067812, mode=Mode.SUBTRACT)

    # Sketch3 → Cut-Extrude2 (cut)
    with BuildSketch(Plane(origin=(34.2, 0, 0), x_dir=(0, 0, -1), z_dir=(1, 0, 0))):
        with Locations((7, 3.264661276)):
            Rectangle(SKETCH3_W, SKETCH3_H)
    extrude(amount=-CUT_EXTRUDE2_DEPTH, mode=Mode.SUBTRACT)

    # Sketch4 → Cut-Extrude3 (cut)
    with BuildSketch(Plane(origin=(0, 2, 0), x_dir=(1, 0, 0), z_dir=(0, 1, 0))):
        with Locations(Location((9.446942501, 11.641698117, 0), (0, 0, 270))):
            Circle(SKETCH4_R)
        with Locations(Location((30.446985681, 11.641698117, 0), (0, 0, 270))):
            Circle(SKETCH4_R)
        with Locations(Location((30.446985681, 2.141677797, 0), (0, 0, 270))):
            Circle(SKETCH4_R)
    extrude(amount=-CUT_EXTRUDE3_DEPTH, mode=Mode.SUBTRACT)

    # Sketch5 → Boss-Extrude3 (add)
    with BuildSketch(Plane.ZY.offset(1.2)):
        with Locations((-7, 2.65515104)):
            Rectangle(SKETCH5_W, SKETCH5_H)
    extrude(amount=-BOSS_EXTRUDE3_DEPTH)

    # Fillet2
    fillet2_edges = [part.edges().sort_by_distance(p)[0] for p in [
        (-0.7, 3.310302081, -12),
        (-0.7, 3.310302081, -2),
    ]]
    fillet(fillet2_edges, radius=FILLET2_R)


solid = part.part
